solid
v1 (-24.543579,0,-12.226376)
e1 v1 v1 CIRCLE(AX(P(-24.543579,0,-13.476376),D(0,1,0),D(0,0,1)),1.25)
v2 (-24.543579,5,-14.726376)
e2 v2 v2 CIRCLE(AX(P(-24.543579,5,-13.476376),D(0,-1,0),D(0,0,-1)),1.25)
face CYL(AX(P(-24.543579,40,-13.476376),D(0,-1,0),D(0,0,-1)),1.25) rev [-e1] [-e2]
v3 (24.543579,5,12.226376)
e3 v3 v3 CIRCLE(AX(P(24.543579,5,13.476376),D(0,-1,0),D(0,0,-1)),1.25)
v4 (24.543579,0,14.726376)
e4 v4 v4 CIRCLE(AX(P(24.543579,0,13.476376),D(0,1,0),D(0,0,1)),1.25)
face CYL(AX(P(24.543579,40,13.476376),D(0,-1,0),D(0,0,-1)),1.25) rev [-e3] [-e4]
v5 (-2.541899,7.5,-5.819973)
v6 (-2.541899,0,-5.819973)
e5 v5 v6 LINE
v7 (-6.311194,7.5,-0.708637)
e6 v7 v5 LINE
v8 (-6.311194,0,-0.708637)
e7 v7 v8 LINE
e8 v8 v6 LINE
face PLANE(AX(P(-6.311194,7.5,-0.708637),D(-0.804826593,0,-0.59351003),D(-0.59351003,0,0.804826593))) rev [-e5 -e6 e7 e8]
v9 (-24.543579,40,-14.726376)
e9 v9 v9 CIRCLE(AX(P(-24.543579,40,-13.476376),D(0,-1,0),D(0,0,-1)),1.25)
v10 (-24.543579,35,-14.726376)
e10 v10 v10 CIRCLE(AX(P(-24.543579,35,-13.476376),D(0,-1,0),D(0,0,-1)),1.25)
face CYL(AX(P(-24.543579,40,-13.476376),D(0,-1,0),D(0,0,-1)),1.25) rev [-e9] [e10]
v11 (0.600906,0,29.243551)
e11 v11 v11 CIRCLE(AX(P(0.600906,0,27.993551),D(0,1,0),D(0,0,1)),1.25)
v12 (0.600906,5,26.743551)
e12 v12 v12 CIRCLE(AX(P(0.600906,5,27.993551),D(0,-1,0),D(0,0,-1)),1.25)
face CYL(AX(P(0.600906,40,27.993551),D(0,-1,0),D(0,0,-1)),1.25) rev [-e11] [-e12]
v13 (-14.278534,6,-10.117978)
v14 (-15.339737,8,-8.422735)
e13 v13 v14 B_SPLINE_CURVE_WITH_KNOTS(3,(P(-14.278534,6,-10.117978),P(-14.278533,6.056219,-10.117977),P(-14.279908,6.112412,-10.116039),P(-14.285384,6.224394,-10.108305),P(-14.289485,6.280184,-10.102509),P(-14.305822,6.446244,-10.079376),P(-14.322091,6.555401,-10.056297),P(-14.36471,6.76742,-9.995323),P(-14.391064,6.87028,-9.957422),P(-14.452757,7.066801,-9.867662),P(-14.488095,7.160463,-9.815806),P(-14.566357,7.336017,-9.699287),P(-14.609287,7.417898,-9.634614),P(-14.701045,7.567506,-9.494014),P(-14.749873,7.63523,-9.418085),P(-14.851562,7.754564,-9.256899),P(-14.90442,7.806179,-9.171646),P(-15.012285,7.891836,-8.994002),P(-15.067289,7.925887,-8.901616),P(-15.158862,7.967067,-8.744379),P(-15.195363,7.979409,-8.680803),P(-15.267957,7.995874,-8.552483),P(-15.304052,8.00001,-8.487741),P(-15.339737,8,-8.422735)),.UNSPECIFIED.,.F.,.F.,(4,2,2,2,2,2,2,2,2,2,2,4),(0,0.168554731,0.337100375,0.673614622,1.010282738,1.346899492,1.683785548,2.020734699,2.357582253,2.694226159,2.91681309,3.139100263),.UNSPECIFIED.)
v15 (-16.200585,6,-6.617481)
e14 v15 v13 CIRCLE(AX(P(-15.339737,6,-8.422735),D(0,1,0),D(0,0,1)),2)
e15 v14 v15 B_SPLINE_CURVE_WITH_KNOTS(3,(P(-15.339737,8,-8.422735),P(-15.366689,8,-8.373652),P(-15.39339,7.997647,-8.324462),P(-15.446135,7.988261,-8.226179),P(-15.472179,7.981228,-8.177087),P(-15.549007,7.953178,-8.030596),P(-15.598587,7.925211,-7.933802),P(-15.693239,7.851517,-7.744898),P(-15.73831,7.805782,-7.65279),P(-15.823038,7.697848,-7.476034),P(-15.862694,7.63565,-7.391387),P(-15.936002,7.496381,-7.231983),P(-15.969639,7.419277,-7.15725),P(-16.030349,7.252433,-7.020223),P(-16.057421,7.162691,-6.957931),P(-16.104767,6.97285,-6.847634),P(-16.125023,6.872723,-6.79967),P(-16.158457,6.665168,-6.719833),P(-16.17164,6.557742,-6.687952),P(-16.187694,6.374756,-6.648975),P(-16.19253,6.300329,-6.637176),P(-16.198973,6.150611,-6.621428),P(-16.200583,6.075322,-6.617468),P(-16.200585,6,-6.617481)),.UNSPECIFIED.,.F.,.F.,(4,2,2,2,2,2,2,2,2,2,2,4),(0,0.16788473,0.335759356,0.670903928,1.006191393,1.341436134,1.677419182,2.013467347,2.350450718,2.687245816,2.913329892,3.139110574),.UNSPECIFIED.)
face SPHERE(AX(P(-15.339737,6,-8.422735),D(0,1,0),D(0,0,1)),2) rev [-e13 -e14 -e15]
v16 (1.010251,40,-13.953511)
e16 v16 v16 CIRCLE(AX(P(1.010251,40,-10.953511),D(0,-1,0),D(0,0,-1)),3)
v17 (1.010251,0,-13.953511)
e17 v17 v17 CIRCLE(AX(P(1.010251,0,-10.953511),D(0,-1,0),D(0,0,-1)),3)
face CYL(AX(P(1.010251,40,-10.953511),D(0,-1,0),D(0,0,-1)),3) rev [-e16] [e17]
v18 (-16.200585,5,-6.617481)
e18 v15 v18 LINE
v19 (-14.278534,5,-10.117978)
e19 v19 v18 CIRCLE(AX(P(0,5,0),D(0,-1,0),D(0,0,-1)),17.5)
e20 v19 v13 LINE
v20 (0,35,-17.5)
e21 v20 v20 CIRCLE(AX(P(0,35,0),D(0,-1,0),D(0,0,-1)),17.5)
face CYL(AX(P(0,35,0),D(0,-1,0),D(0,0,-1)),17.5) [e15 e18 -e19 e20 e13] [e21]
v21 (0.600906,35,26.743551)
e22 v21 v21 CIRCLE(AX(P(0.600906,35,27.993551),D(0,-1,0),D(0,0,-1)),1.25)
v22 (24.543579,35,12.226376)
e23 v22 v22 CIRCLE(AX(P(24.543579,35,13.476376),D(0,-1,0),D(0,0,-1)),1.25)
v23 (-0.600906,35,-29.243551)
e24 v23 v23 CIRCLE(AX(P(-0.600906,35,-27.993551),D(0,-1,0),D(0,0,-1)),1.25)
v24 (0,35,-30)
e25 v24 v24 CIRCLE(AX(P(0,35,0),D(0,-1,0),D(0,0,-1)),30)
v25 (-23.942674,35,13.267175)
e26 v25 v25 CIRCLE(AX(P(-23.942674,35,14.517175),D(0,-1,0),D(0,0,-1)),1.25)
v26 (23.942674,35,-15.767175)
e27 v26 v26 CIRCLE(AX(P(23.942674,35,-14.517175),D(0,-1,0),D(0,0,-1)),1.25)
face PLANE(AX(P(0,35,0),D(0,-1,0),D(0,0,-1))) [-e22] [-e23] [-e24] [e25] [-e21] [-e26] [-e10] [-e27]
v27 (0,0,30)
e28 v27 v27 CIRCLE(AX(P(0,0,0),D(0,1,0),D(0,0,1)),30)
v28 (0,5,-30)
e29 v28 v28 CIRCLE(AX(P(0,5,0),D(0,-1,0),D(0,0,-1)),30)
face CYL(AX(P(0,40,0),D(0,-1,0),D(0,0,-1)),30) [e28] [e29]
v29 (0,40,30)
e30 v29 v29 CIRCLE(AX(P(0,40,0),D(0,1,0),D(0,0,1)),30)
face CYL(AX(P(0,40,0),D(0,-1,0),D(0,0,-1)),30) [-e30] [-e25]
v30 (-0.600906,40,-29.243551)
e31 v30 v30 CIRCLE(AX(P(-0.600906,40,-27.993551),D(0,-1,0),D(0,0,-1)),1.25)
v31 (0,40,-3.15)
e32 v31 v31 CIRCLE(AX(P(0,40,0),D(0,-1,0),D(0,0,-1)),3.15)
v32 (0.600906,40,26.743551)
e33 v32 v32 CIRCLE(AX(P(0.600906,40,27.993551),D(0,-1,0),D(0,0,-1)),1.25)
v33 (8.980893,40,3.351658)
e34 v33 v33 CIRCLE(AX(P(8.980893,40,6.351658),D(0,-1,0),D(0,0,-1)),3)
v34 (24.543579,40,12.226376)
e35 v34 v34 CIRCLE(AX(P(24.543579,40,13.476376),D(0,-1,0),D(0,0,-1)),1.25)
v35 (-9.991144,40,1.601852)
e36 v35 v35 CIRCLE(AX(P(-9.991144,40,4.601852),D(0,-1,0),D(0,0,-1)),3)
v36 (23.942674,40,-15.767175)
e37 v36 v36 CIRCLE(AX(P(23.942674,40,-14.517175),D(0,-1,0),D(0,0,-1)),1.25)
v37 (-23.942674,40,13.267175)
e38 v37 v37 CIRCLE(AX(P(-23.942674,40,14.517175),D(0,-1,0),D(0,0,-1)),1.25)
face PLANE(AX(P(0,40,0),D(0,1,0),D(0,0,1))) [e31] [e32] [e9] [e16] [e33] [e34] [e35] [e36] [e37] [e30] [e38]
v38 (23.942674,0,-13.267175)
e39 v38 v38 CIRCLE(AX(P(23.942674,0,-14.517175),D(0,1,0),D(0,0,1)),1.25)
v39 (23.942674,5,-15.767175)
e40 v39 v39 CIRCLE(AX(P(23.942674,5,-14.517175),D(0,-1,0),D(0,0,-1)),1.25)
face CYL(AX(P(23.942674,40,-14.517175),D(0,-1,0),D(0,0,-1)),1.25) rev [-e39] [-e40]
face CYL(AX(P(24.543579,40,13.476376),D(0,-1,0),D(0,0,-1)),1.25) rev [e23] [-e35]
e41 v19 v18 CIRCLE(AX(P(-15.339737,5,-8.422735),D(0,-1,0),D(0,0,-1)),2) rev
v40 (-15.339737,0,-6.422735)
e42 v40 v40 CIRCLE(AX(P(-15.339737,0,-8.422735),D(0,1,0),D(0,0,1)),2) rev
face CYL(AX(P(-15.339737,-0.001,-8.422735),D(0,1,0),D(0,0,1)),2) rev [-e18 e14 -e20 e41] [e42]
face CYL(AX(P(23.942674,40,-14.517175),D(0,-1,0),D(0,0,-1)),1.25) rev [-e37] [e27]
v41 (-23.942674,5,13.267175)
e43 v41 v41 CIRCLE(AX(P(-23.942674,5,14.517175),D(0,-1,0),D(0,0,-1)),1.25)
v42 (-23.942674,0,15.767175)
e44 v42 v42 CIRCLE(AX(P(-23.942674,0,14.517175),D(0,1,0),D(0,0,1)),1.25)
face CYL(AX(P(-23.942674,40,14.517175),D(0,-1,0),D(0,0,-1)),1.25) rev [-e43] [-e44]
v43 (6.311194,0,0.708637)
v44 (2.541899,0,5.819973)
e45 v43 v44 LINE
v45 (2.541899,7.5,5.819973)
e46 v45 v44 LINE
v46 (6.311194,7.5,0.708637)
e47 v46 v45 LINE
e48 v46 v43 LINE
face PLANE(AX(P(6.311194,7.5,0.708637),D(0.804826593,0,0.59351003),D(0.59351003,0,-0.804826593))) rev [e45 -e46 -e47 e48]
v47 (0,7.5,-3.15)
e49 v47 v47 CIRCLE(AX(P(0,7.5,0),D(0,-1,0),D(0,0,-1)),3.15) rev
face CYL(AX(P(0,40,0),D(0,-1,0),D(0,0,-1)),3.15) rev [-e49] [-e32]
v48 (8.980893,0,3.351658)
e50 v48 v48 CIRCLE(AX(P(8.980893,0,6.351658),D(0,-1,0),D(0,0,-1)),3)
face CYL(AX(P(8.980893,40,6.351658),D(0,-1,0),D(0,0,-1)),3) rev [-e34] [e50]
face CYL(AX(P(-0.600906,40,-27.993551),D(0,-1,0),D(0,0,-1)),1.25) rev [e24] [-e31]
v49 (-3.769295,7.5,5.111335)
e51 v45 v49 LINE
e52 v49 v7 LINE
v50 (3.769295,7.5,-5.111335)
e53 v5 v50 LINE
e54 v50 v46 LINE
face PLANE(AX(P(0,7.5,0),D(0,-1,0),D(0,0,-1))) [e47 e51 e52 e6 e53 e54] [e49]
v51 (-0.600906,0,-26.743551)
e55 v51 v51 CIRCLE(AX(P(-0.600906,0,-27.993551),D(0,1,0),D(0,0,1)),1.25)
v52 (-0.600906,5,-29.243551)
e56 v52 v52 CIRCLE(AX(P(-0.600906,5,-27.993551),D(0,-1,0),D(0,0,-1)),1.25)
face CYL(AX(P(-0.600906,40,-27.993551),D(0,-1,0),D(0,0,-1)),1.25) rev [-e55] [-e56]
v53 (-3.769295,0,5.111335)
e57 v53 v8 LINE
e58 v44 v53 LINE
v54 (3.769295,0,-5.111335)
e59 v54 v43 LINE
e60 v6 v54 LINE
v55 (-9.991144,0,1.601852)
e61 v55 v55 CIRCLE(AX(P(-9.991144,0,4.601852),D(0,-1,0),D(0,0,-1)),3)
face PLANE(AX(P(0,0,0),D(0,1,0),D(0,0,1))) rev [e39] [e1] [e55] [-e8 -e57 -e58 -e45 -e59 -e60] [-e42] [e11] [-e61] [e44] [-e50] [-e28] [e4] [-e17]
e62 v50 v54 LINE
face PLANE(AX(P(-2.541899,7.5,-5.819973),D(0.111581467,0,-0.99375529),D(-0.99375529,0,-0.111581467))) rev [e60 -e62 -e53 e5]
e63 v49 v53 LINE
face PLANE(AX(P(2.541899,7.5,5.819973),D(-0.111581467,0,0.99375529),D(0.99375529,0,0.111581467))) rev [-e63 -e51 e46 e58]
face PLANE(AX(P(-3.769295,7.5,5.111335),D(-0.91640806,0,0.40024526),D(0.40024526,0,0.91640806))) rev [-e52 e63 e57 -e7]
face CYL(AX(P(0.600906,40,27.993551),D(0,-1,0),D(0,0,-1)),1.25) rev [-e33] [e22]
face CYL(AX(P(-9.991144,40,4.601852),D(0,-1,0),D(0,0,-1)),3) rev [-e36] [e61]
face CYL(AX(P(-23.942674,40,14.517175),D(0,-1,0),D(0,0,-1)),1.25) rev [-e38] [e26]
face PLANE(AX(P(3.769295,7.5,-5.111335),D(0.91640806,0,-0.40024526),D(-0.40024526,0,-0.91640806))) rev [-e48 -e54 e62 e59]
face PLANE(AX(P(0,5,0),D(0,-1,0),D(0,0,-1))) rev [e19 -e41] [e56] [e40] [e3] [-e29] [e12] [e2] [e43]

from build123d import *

# Parameters (mm, degrees)
SKETCH1_R               = 30
BOSS_EXTRUDE1_DEPTH     = 40
CUT_EXTRUDE1_START      = -5
SKETCH2_OUTSIDE_W       = 80.762
SKETCH2_OUTSIDE_H       = 80.762
SKETCH2_OUTSIDE_R       = 17.5
CUT_EXTRUDE1_DEPTH      = 30
SKETCH3_R               = 3.15
CUT_EXTRUDE2_DEPTH      = 59.309518948
CUT_EXTRUDE3_DEPTH      = 59.309518948
CUT_EXTRUDE4_REACH      = 60
CUT_EXTRUDE4_START      = 3
SKETCH5_R               = 2
CUT_EXTRUDE5_DEPTH      = 7.5
FILLET1_R               = 2
CUT_EXTRUDE6_DEPTH      = 59.309518948
CUT_EXTRUDE6_DEPTH_BACK = 59.309518948


with BuildPart() as part:
    # Sketch1 → Boss-Extrude1 (new body)
    with BuildSketch(Plane(origin=(0, 0, 0), x_dir=(1, 0, 0), z_dir=(0, 1, 0))):
        with Locations(Location((0, 0, 0), (0, 0, 270))):
            Circle(SKETCH1_R)
    extrude(amount=BOSS_EXTRUDE1_DEPTH)

    # Sketch2 outside → Cut-Extrude1 (cut)
    with BuildSketch(Plane.XZ.offset(CUT_EXTRUDE1_START)):
        Rectangle(SKETCH2_OUTSIDE_W, SKETCH2_OUTSIDE_H)
        with Locations(Location((0, 0, 0), (0, 0, 270))):
            Circle(SKETCH2_OUTSIDE_R, mode=Mode.SUBTRACT)
    extrude(amount=-CUT_EXTRUDE1_DEPTH, mode=Mode.SUBTRACT)

    # Sketch3 → Cut-Extrude2 (cut, through all)
    with BuildSketch(Plane.XZ):
        with Locations(Location((0, 0, 0), (0, 0, 270))):
            Circle(SKETCH3_R)
    extrude(amount=-CUT_EXTRUDE2_DEPTH, mode=Mode.SUBTRACT)

    # Sketch4 → Cut-Extrude3 (cut, through all)
    with BuildSketch(Plane.XZ):
        with BuildLine():
            ThreePointArc((3.997571838, -10.67798761), (0.734727839, -7.966189491), (-1.97707028, -11.229033489))
            Line((-1.97707028, -11.229033489), (3.997571838, -10.67798761))
        make_face()
        with BuildLine():
            Line((3.997571838, -10.67798761), (-1.97707028, -11.229033489))
            ThreePointArc((-1.97707028, -11.229033489), (1.148158035, -13.950339138), (4.010250779, -10.95351055))
            ThreePointArc((4.010250779, -10.95351055), (4.007079367, -10.815603293), (3.997571838, -10.67798761))
        make_face()
        with BuildLine():
            ThreePointArc((7.248622613, 8.80099257), (6.531558551, 4.619387719), (10.713163402, 3.902323657))
            Line((10.713163402, 3.902323657), (7.248622613, 8.80099257))
        make_face()
        with BuildLine():
            Line((7.248622613, 8.80099257), (10.713163402, 3.902323657))
            ThreePointArc((10.713163402, 3.902323657), (11.645176324, 4.972675007), (11.980893007, 6.351658113))
            ThreePointArc((11.980893007, 6.351658113), (10.359876114, 9.01594143), (7.248622613, 8.80099257))
        make_face()
        with BuildLine():
            ThreePointArc((-8.736093122, 7.326709833), (-12.716001182, 5.856903101), (-11.246194451, 1.87699504))
            Line((-11.246194451, 1.87699504), (-8.736093122, 7.326709833))
        make_face()
        with BuildLine():
            Line((-8.736093122, 7.326709833), (-11.246194451, 1.87699504))
            ThreePointArc((-11.246194451, 1.87699504), (-8.373298304, 2.075476376), (-6.991143786, 4.601852436))
            ThreePointArc((-6.991143786, 4.601852436), (-7.464767726, 6.219697918), (-8.736093122, 7.326709833))
        make_face()
    extrude(amount=-CUT_EXTRUDE3_DEPTH, mode=Mode.SUBTRACT)

    # Sketch5 → Cut-Extrude4 (cut, up to next)
    with BuildSketch(Plane(origin=(0, 5, 0), x_dir=(1, 0, 0), z_dir=(0, 1, 0)).offset(CUT_EXTRUDE4_START), mode=Mode.PRIVATE) as cut_extrude4_sk1:
        with Locations(Location((-15.339737127, 8.422734999, 0), (0, 0, 270))):
            Circle(SKETCH5_R)
    cut_extrude4_tool1 = extrude(cut_extrude4_sk1.sketch, amount=-CUT_EXTRUDE4_REACH, mode=Mode.PRIVATE) & part.part
    add(cut_extrude4_tool1.solids().sort_by_distance((-15.339737, 8, -8.422735))[0], mode=Mode.SUBTRACT)

    # Sketch6 → Cut-Extrude5 (cut)
    with BuildSketch(Plane.XZ):
        Polygon((-6.311193726, -0.70863749), (-2.541898795, -5.819972839), (3.769294931, -5.11133535), (6.311193726, 0.70863749), (2.541898795, 5.819972839), (-3.769294931, 5.11133535), align=None)
    extrude(amount=-CUT_EXTRUDE5_DEPTH, mode=Mode.SUBTRACT)

    # Fillet1
    fillet1_edges = [part.edges().sort_by_distance(p)[0] for p in [
        (-13.417435738, 8, -7.870686661),
    ]]
    fillet(fillet1_edges, radius=FILLET1_R - 0.0001)  # a hair under: the kernel refuses the full size

    # Sketch7 → Cut-Extrude6 (cut, two sides: drawn at the far end of the back side and taken through both)
    with BuildSketch(Plane(origin=(0, 0, 0), x_dir=(-1, 0, 0), z_dir=(0, -1, 0)).offset(-CUT_EXTRUDE6_DEPTH_BACK)):
        with BuildLine():
            Line((-24.516753255, -12.226663888), (-24.543579404, -13.476375998))
            Line((-24.543579404, -13.476375998), (-23.474710044, -14.12446418))
            ThreePointArc((-23.474710044, -14.12446418), (-23.339713402, -13.812837958), (-23.293579404, -13.476375998))
            ThreePointArc((-23.293579404, -13.476375998), (-23.650261799, -12.602028438), (-24.516753255, -12.226663888))
        make_face()
        with BuildLine():
            Line((-23.474710044, -14.12446418), (-24.543579404, -13.476375998))
            Line((-24.543579404, -13.476375998), (-24.516753255, -12.226663888))
            ThreePointArc((-24.516753255, -12.226663888), (-25.639274913, -14.077999927), (-23.474710044, -14.12446418))
        make_face()
        with BuildLine():
            ThreePointArc((0.494789773, -27.391927334), (-0.574079587, -26.743839153), (-1.669775096, -27.345463081))
            Line((-1.669775096, -27.345463081), (-0.600905736, -27.993551263))
            Line((-0.600905736, -27.993551263), (0.494789773, -27.391927334))
        make_face()
        with BuildLine():
            Line((-0.600905736, -27.993551263), (-1.669775096, -27.345463081))
            ThreePointArc((-1.669775096, -27.345463081), (-0.937367695, -29.197417264), (0.649094264, -27.993551263))
            ThreePointArc((0.649094264, -27.993551263), (0.609903783, -27.683002866), (0.494789773, -27.391927334))
            Line((0.494789773, -27.391927334), (-0.600905736, -27.993551263))
        make_face()
        with BuildLine():
            ThreePointArc((23.969499816, -13.267463154), (22.873804307, -13.869087083), (22.846978158, -15.118799193))
            Line((22.846978158, -15.118799193), (23.942673667, -14.517175264))
            Line((23.942673667, -14.517175264), (23.969499816, -13.267463154))
        make_face()
        with BuildLine():
            Line((23.942673667, -14.517175264), (22.846978158, -15.118799193))
            ThreePointArc((22.846978158, -15.118799193), (24.253222064, -15.727984784), (25.192673667, -14.517175264))
            ThreePointArc((25.192673667, -14.517175264), (24.835991272, -13.642827704), (23.969499816, -13.267463154))
            Line((23.969499816, -13.267463154), (23.942673667, -14.517175264))
        make_face()
        with BuildLine():
            ThreePointArc((23.474710044, 14.12446418), (23.447883895, 12.87475207), (24.516753255, 12.226663888))
            Line((24.516753255, 12.226663888), (24.543579404, 13.476375998))
            Line((24.543579404, 13.476375998), (23.474710044, 14.12446418))
        make_face()
        with BuildLine():
            Line((24.543579404, 13.476375998), (24.516753255, 12.226663888))
            ThreePointArc((24.516753255, 12.226663888), (25.417926964, 12.583058394), (25.793579404, 13.476375998))
            ThreePointArc((25.793579404, 13.476375998), (24.880041363, 14.680242), (23.474710044, 14.12446418))
            Line((23.474710044, 14.12446418), (24.543579404, 13.476375998))
        make_face()
        with BuildLine():
            ThreePointArc((1.850905736, 27.993551263), (0.290357339, 29.204360782), (-0.494789773, 27.391927334))
            Line((-0.494789773, 27.391927334), (0.600905736, 27.993551263))
            Line((0.600905736, 27.993551263), (1.669775096, 27.345463081))
            ThreePointArc((1.669775096, 27.345463081), (1.804771738, 27.657089304), (1.850905736, 27.993551263))
        make_face()
        with BuildLine():
            Line((0.600905736, 27.993551263), (-0.494789773, 27.391927334))
            ThreePointArc((-0.494789773, 27.391927334), (0.574079587, 26.743839153), (1.669775096, 27.345463081))
            Line((1.669775096, 27.345463081), (0.600905736, 27.993551263))
        make_face()
        with BuildLine():
            ThreePointArc((-22.846978158, 15.118799193), (-25.011543028, 15.165263446), (-23.969499816, 13.267463154))
            Line((-23.969499816, 13.267463154), (-23.942673667, 14.517175264))
            Line((-23.942673667, 14.517175264), (-22.846978158, 15.118799193))
        make_face()
        with BuildLine():
            Line((-23.942673667, 14.517175264), (-23.969499816, 13.267463154))
            ThreePointArc((-23.969499816, 13.267463154), (-23.068326107, 13.623857659), (-22.692673667, 14.517175264))
            ThreePointArc((-22.692673667, 14.517175264), (-22.731864148, 14.827723661), (-22.846978158, 15.118799193))
            Line((-22.846978158, 15.118799193), (-23.942673667, 14.517175264))
        make_face()
    extrude(amount=CUT_EXTRUDE6_DEPTH + CUT_EXTRUDE6_DEPTH_BACK, mode=Mode.SUBTRACT)


solid = part.part
